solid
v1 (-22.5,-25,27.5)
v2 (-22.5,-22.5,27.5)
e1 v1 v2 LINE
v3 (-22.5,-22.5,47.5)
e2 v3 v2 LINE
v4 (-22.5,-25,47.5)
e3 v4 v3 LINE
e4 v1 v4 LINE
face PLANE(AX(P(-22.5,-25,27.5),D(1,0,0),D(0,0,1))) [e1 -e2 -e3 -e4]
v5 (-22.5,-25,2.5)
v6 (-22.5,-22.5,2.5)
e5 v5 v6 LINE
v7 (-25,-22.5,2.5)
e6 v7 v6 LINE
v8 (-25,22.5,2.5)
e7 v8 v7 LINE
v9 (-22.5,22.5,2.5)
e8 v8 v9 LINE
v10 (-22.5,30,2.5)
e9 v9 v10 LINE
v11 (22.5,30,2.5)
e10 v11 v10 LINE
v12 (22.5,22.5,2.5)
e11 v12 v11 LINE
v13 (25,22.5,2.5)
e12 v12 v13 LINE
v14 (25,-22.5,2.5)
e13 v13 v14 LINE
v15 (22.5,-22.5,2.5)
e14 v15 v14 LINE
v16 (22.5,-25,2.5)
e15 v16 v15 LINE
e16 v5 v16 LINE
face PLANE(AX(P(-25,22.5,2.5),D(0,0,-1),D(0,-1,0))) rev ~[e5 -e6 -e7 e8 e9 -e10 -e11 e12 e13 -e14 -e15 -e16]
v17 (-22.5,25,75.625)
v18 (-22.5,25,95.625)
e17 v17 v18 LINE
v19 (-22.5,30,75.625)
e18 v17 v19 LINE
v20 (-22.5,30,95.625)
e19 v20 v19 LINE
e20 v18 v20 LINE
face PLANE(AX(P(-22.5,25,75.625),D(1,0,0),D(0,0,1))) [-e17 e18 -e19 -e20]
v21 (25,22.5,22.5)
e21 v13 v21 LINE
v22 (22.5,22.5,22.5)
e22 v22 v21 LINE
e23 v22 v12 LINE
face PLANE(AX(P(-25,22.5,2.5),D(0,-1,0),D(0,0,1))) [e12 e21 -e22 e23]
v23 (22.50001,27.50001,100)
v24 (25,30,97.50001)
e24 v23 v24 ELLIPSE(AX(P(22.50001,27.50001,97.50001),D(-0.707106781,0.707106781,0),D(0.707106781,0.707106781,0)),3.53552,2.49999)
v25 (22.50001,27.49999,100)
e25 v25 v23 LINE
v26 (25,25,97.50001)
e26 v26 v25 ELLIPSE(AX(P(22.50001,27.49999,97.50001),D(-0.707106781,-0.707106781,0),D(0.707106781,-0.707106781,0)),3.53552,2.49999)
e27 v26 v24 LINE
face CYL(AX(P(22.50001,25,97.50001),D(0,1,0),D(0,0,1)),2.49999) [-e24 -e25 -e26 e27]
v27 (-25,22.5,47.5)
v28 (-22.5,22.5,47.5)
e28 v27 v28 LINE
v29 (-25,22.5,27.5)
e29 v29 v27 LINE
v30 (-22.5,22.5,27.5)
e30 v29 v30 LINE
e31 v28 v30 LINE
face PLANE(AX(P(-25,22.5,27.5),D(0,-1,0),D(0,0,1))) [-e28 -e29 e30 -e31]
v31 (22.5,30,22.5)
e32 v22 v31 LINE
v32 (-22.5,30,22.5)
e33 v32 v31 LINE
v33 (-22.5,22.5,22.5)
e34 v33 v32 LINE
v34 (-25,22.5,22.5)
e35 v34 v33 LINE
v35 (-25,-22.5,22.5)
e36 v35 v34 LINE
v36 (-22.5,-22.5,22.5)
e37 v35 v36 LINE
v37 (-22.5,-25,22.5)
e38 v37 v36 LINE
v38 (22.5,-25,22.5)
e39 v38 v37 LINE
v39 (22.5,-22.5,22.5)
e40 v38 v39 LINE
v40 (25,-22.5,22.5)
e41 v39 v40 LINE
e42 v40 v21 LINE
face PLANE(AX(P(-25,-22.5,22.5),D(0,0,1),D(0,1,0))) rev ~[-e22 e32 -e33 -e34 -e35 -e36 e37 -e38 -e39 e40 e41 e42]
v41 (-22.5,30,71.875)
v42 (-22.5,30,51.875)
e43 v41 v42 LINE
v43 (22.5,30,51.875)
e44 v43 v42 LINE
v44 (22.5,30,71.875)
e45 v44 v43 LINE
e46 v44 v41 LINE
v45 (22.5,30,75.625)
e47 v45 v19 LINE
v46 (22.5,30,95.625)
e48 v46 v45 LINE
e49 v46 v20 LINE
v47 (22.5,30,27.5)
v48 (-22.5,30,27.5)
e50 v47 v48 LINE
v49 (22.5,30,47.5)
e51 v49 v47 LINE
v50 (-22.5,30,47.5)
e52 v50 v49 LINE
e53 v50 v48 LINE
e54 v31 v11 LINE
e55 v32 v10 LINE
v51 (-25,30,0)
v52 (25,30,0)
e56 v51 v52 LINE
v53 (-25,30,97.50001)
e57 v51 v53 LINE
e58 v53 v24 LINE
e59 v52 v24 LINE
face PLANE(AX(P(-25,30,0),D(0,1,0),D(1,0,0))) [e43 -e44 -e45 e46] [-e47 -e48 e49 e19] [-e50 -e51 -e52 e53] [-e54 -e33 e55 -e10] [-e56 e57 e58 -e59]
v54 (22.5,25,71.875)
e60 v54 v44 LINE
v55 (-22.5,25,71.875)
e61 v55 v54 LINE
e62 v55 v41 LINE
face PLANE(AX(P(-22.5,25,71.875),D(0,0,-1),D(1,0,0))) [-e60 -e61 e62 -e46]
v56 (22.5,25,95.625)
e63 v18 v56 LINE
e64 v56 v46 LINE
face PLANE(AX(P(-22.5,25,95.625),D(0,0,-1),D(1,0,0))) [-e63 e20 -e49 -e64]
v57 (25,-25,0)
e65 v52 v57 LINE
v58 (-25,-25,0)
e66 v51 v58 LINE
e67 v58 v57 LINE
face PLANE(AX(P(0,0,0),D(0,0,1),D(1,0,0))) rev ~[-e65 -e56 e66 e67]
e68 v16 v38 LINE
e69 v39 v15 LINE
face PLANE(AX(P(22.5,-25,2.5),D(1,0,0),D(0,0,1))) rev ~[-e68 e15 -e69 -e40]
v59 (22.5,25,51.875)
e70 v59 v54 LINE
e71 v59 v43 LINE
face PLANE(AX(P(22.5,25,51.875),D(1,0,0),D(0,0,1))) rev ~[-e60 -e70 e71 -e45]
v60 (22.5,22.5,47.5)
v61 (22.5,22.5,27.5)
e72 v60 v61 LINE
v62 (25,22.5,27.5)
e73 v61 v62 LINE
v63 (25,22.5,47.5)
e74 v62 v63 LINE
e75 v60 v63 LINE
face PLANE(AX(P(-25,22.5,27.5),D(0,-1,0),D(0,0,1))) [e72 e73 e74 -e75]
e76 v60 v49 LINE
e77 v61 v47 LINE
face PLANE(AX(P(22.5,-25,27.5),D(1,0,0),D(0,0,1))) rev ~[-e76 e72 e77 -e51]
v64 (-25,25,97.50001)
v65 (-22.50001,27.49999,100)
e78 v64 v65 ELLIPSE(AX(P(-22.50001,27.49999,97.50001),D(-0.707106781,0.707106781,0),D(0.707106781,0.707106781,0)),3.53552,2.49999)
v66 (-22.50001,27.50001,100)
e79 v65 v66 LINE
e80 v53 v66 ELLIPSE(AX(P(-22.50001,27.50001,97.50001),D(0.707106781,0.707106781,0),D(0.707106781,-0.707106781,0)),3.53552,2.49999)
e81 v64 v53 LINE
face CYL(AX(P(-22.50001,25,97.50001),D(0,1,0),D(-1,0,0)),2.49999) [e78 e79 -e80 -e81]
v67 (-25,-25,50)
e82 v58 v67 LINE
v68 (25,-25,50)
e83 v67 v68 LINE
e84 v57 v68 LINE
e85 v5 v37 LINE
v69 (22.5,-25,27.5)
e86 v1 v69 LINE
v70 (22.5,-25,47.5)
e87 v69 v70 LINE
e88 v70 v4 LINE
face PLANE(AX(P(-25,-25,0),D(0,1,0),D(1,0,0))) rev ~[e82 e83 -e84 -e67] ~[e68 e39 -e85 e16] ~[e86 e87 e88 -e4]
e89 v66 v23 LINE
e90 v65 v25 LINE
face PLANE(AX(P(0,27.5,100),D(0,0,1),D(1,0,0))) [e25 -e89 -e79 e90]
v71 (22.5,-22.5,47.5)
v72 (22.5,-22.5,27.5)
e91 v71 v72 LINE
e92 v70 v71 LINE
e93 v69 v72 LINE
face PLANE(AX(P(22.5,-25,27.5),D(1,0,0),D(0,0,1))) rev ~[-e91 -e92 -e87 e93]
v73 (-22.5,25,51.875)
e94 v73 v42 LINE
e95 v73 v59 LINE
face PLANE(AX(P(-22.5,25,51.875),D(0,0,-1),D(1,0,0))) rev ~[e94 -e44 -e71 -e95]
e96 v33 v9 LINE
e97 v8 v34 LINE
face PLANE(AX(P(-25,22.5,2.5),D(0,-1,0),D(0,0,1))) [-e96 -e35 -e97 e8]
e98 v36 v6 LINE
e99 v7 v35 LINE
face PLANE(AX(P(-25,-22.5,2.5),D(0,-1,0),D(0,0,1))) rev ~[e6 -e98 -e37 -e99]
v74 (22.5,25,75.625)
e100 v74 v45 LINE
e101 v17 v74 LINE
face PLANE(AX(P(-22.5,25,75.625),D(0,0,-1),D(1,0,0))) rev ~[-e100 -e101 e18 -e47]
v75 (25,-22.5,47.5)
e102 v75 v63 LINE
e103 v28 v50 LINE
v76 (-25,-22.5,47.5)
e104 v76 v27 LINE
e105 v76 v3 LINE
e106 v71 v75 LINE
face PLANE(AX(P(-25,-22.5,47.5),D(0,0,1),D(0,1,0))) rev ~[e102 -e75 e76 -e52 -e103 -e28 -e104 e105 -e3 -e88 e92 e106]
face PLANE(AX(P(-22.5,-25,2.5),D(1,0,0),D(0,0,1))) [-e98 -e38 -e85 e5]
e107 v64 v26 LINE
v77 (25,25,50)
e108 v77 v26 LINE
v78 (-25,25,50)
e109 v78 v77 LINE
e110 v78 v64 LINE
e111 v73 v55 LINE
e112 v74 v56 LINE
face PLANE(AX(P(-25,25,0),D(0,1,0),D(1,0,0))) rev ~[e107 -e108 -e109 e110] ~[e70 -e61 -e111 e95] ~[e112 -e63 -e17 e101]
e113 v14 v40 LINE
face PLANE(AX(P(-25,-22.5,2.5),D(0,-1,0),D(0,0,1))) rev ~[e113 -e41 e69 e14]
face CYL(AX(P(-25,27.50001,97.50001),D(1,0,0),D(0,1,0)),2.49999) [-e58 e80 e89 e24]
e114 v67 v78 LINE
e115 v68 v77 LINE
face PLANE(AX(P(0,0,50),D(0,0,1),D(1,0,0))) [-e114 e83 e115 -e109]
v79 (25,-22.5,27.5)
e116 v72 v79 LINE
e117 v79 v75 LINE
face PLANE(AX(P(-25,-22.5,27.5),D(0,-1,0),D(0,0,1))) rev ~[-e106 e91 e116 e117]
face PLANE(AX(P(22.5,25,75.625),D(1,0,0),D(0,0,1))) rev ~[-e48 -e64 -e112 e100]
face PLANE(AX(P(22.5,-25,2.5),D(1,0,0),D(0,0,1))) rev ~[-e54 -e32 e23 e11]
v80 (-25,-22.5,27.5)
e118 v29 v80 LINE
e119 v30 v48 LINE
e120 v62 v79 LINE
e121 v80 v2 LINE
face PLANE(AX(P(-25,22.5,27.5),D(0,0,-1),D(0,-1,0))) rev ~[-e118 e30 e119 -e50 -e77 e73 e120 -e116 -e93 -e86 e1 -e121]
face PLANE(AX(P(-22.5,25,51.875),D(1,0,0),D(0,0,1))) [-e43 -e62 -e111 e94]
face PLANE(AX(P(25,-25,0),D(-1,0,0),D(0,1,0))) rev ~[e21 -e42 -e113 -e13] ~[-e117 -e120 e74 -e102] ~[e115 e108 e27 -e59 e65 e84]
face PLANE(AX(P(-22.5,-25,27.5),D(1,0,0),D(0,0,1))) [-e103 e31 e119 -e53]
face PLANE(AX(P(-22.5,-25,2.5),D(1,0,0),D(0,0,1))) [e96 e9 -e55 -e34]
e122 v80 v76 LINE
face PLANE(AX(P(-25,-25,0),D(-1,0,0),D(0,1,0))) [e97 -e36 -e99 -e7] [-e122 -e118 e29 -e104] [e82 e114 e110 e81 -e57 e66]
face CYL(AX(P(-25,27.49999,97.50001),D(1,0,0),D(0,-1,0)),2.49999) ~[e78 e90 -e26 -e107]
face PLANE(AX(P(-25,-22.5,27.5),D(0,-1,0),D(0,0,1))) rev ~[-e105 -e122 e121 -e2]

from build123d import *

# Parameters (mm, degrees)
F0_W     = 50
F0_H     = 5
F1_DEPTH = 100
F0_H_2   = 50
F2_DEPTH = 50
F3_W     = 22.5
F3_H     = 20
F4_DEPTH = 100
F5_W     = 22.5
F5_H     = 20
F6_DEPTH = 55
F7_R     = 2.49999
F8_W     = 45
F8_H     = 20
F9_DEPTH = 25


# Not quite as in the source:
# - a fillet or chamfer is up to 0.001 mm smaller than in the source, because OpenCascade refuses the exact size


with BuildPart() as f1:
    # F0 (on Top) → F1 (new body)
    with BuildSketch(Plane.XY):
        with Locations((0, 27.5)):
            Rectangle(F0_W, F0_H)
    extrude(amount=F1_DEPTH)

    # F0 (on Top) → F2 (join)
    with BuildSketch(Plane.XY):
        Rectangle(F0_W, F0_H_2)
    extrude(amount=F2_DEPTH)

    # F3 (on face) → F4 (cut)
    with BuildSketch(Plane.XZ.offset(25)):
        with Locations((-11.25, 37.5)):
            Rectangle(F3_W, F3_H)
        with Locations((11.25, 37.5)):
            Rectangle(F3_W, F3_H)
        with Locations((-11.25, 12.5)):
            Rectangle(F3_W, F3_H)
        with Locations((11.25, 12.5)):
            Rectangle(F3_W, F3_H)
    extrude(amount=-F4_DEPTH, mode=Mode.SUBTRACT)

    # F5 (on face) → F6 (cut)
    with BuildSketch(Plane(origin=(-25, 0, 0), x_dir=(0, -1, 0), z_dir=(-1, 0, 0))):
        with Locations((-11.25, 37.5)):
            Rectangle(F5_W, F5_H)
        with Locations((11.25, 37.5)):
            Rectangle(F5_W, F5_H)
        with Locations((11.25, 12.5)):
            Rectangle(F5_W, F5_H)
        with Locations((-11.25, 12.5)):
            Rectangle(F5_W, F5_H)
    extrude(amount=-F6_DEPTH, mode=Mode.SUBTRACT)

    # F7 (radius 2.5 in the source; OpenCascade refuses exactly that, so slightly less here)
    f7_edges = [f1.edges().sort_by_distance(p)[0] for p in [
        (0, 25, 100),
        (25, 27.5, 100),
        (0, 30, 100),
        (-25, 27.5, 100),
    ]]
    fillet(f7_edges, radius=F7_R)

    # F8 (on face) → F9 (cut)
    with BuildSketch(Plane.XZ.offset(-25)):
        with Locations((0, 85.625)):
            Rectangle(F8_W, F8_H)
        with Locations((0, 61.875)):
            Rectangle(F8_W, F8_H)
    extrude(amount=-F9_DEPTH, mode=Mode.SUBTRACT)


solid = f1.part
